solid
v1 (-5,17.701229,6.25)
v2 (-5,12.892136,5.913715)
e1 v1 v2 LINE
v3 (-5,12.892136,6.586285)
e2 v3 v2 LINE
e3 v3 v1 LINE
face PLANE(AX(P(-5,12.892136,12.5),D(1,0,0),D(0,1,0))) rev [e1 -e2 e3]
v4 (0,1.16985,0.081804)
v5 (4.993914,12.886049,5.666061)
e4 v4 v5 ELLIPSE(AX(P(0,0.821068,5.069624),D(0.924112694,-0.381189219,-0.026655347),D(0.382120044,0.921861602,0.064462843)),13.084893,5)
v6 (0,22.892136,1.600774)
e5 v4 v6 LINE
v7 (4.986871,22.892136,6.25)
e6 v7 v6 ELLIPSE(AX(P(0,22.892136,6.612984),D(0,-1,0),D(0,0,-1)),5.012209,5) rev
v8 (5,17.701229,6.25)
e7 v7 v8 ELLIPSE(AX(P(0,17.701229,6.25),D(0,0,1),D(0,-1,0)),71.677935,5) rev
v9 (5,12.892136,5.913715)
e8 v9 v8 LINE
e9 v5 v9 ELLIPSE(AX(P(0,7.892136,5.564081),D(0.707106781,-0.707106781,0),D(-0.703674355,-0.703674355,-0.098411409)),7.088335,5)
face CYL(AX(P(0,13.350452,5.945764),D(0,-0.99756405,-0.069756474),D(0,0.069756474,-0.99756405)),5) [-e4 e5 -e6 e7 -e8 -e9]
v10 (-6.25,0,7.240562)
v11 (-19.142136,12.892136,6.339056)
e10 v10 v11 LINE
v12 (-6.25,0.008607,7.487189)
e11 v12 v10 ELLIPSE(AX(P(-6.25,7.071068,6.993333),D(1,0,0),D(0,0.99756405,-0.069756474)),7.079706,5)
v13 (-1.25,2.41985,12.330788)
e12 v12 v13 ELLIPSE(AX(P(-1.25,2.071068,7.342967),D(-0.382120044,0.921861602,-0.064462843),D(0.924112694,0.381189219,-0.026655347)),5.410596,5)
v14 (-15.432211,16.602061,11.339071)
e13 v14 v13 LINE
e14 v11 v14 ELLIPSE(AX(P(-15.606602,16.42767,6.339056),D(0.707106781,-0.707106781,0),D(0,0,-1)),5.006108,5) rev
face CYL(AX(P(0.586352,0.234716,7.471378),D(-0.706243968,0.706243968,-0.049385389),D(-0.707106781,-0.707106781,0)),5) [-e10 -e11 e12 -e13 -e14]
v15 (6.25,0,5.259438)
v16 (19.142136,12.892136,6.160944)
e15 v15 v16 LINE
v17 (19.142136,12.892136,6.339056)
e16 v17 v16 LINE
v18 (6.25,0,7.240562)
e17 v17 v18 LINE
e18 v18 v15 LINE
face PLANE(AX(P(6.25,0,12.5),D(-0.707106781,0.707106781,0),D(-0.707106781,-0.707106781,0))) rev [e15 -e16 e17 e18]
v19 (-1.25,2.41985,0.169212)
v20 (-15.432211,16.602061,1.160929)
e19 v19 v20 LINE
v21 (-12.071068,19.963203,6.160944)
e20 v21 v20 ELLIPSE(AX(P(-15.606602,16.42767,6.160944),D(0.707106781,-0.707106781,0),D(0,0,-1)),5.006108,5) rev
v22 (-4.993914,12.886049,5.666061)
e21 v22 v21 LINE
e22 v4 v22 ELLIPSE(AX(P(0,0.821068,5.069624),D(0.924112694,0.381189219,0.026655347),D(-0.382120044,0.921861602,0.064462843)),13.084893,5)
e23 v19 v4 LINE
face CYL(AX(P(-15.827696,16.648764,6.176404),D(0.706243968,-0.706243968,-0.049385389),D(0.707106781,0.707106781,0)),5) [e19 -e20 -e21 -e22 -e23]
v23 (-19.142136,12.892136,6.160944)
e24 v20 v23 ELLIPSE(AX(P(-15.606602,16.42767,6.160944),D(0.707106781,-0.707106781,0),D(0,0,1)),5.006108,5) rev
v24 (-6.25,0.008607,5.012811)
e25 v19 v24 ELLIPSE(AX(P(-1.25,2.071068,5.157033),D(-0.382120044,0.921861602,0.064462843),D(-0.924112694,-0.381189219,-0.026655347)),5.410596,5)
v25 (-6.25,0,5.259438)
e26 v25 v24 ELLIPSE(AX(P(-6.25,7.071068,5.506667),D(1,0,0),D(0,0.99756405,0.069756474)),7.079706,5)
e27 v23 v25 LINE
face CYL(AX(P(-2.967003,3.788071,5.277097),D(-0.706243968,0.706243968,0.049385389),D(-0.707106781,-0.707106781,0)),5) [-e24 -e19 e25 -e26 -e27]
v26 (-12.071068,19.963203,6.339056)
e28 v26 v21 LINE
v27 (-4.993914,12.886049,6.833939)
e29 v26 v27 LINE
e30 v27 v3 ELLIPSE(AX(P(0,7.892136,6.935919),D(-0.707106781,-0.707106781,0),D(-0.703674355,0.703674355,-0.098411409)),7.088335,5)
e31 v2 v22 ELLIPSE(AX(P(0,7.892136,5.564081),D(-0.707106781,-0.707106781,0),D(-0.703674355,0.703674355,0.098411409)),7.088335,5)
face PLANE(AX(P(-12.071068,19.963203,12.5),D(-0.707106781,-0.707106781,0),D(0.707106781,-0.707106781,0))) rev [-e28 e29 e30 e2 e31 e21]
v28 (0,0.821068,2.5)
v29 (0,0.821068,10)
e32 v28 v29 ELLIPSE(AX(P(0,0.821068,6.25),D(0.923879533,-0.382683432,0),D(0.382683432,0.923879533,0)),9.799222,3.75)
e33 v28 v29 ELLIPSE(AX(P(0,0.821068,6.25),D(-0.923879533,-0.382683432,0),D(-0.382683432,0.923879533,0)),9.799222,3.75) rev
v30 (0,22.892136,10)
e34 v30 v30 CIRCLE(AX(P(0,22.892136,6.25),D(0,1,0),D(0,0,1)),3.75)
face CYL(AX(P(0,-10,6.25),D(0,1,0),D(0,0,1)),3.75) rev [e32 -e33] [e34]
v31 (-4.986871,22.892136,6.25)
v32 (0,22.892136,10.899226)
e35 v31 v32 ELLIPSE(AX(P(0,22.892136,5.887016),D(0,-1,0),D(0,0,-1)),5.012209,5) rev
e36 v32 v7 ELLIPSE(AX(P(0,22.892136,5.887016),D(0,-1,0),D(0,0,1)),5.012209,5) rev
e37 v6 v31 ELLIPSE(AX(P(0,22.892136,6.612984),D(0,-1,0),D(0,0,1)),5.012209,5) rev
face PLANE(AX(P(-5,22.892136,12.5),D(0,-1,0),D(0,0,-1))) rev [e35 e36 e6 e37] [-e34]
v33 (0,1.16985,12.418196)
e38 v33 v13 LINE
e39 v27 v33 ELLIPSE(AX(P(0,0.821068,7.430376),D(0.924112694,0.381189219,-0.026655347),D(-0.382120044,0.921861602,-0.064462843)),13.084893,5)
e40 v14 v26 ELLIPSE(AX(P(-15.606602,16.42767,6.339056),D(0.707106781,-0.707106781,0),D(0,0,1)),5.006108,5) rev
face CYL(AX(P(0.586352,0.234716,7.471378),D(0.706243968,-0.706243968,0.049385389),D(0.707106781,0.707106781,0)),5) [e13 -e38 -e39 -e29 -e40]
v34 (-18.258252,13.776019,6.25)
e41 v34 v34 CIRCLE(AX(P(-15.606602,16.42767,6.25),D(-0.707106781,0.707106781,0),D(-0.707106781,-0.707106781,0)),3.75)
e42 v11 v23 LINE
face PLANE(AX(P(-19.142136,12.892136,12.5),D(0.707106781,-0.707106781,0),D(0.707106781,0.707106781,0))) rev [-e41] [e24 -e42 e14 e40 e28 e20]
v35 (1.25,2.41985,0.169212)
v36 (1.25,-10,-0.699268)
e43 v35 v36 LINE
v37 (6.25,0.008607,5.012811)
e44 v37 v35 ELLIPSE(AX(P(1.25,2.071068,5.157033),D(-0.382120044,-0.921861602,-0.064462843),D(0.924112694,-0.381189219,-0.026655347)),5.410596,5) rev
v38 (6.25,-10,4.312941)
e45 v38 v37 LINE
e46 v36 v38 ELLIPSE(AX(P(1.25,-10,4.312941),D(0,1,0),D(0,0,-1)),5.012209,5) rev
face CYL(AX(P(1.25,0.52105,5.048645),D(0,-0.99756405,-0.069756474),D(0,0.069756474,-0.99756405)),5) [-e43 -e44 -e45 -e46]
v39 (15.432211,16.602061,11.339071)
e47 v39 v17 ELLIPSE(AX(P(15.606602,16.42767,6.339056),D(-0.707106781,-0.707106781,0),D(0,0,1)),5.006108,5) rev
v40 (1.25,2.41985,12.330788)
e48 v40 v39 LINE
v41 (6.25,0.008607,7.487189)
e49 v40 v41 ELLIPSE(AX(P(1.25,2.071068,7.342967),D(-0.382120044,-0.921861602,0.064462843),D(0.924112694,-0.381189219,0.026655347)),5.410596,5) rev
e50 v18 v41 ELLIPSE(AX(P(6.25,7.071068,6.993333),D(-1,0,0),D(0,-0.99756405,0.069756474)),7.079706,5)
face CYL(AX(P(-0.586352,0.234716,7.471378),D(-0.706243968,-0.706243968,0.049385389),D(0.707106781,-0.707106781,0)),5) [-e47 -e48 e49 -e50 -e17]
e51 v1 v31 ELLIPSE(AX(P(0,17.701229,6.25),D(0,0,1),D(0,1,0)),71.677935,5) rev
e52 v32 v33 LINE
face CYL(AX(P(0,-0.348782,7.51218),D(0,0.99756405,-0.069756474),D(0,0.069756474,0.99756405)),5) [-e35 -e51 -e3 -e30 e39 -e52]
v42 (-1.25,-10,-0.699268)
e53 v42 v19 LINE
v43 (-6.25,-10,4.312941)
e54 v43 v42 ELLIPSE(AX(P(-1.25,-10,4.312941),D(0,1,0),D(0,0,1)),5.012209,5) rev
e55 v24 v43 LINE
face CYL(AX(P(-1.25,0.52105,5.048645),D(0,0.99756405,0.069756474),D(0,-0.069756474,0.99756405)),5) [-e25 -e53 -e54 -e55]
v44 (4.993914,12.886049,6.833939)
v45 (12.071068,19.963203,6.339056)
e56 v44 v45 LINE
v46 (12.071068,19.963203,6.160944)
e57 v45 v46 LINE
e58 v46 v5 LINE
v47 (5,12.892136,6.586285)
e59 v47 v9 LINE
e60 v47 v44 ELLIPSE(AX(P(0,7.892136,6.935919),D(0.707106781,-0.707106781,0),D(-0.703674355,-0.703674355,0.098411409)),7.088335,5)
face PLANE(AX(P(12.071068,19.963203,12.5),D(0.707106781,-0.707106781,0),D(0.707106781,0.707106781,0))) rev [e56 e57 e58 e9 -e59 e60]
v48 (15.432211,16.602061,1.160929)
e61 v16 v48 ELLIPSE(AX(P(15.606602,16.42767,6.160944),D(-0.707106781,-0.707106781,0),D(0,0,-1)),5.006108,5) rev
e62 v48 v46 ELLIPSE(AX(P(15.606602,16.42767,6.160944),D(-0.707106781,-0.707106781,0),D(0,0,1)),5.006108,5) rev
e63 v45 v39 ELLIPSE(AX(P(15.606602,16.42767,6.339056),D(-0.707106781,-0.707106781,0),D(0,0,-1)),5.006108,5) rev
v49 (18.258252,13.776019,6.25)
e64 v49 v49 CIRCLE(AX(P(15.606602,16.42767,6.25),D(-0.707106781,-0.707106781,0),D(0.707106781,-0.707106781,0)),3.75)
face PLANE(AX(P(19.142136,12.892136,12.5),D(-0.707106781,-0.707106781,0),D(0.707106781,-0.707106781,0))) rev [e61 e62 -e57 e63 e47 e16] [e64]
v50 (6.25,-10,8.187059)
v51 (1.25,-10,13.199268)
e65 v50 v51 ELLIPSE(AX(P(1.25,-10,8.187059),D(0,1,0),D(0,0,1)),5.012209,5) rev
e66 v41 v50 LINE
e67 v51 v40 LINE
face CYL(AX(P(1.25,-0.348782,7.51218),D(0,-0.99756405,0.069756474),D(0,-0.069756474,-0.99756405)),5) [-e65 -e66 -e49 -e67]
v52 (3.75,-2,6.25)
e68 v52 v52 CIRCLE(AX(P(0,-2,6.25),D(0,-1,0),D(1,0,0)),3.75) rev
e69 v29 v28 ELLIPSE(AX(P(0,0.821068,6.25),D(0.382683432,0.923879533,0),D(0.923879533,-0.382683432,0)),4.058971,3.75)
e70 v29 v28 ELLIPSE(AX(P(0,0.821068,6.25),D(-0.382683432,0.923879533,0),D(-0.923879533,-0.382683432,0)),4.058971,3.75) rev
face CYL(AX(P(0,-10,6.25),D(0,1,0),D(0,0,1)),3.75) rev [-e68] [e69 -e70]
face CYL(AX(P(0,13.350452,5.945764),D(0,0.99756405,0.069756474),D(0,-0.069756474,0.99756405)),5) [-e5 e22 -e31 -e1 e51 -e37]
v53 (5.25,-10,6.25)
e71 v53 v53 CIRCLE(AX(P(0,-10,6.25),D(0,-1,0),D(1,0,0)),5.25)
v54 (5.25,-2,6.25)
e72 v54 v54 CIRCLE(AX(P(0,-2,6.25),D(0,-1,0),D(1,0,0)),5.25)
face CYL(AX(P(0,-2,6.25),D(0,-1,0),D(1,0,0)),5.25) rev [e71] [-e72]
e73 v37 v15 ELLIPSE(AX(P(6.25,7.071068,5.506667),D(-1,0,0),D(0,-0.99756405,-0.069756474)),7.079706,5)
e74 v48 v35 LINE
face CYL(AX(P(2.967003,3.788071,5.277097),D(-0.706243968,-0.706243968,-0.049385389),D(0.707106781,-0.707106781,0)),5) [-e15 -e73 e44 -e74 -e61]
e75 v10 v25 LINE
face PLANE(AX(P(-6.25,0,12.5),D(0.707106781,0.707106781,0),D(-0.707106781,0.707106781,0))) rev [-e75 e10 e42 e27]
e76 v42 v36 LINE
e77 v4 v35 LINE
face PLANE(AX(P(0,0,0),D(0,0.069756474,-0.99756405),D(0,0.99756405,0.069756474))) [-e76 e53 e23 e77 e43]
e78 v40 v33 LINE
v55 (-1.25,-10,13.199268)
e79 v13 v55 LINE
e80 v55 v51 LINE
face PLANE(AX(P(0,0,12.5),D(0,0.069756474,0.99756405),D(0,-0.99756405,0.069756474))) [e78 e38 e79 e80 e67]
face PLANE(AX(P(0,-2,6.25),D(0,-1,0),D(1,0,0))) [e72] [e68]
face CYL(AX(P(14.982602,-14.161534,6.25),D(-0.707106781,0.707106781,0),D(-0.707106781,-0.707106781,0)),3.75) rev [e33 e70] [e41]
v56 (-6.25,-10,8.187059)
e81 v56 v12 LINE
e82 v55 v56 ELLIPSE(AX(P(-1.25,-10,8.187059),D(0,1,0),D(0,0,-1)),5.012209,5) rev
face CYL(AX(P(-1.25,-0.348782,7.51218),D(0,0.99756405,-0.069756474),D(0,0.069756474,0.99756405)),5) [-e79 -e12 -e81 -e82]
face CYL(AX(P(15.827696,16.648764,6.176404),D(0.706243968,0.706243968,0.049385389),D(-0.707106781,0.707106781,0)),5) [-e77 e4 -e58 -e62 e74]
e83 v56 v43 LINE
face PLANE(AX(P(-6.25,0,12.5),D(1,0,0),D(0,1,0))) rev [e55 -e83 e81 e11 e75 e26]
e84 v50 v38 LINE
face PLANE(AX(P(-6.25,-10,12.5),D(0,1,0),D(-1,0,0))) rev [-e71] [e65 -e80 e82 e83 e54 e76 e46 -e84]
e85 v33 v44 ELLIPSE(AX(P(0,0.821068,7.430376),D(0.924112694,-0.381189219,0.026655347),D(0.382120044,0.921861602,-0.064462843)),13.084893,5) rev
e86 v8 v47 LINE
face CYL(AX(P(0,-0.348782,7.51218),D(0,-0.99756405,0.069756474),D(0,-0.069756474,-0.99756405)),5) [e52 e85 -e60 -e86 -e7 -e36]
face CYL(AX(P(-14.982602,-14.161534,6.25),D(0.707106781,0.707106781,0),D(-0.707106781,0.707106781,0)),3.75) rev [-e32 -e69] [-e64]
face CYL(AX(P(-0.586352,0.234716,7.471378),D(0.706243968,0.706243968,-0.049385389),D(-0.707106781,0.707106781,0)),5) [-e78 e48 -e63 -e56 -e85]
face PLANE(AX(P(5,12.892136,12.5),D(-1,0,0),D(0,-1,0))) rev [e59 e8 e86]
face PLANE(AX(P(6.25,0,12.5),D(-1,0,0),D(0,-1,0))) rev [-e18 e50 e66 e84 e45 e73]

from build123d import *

# Parameters (mm, degrees)
EXTRUDE_618_DEPTH           = 12.5
SKETCH_4_R                  = 3.75
CUT_EXTRUDE_975_DEPTH       = 41.05700865176058
CUT_EXTRUDE_1125_REACH      = 47.49
CUT_EXTRUDE_1125_END_RADIUS = 3.75
SKETCH_5_R                  = 3.749999999999998
SKETCH_9_R                  = 5.25
CUT_EXTRUDE_1299_DEPTH      = 8
DRAFT_2_ANGLE               = 4.000000000000009
FILLET_8_R                  = 5


with BuildPart() as part:
    # Эскиз3 → Extrude 618 (new body)
    with BuildSketch(Plane.XY):
        Polygon((-6.249999999999994, 0), (-19.142135623730994, 12.892135623731), (-12.071067811865465, 19.963203435596466), (-5.000000000000028, 12.892135623730955), (-5.000000000000029, 22.892135623730955), (4.9999999999999964, 22.892135623730955), (5.000000000000001, 12.892135623730955), (12.071067811865465, 19.96320343559647), (19.142135623730994, 12.892135623731003), (6.249999999999991, 1.73e-15), (6.2499999999999964, -10.000000000000002), (-6.2499999999999885, -10.000000000000004), align=None)
    extrude(amount=EXTRUDE_618_DEPTH)

    # Эскиз4 → Cut-Extrude 975 (cut, through all)
    with BuildSketch(Plane(origin=(0, 22.892135623730955, 0), x_dir=(-1, 0, 0), z_dir=(0, 1, 0))):
        with Locations(Location((0, 6.25, 0), (0, 0, 90))):
            Circle(SKETCH_4_R)
    extrude(amount=-CUT_EXTRUDE_975_DEPTH, mode=Mode.SUBTRACT)

    # Cut-Extrude 1125: up to this cylinder (the profile starts outside it)
    cut_extrude_1125_end = Plane(origin=(0, 16.42767, 6.25), z_dir=(0, 1, 0)) * Cylinder(CUT_EXTRUDE_1125_END_RADIUS, 103.48, mode=Mode.PRIVATE)
    # Эскиз5 → Cut-Extrude 1125 (cut, up to the surface)
    with BuildSketch(Plane(origin=(-16.017135623730912, 16.01713562373106, 0), x_dir=(0, 0, 1), z_dir=(-0.707106781186544, 0.7071067811865511, 0)), mode=Mode.PRIVATE) as cut_extrude_1125_sk1:
        with Locations(Location((6.25, 0.5805826175839922, 0), (0, 0, 270))):
            Circle(SKETCH_5_R)
    cut_extrude_1125_tool1 = extrude(cut_extrude_1125_sk1.sketch, amount=-CUT_EXTRUDE_1125_REACH, mode=Mode.PRIVATE) - cut_extrude_1125_end
    cut_extrude_1125 = cut_extrude_1125_tool1.solids().sort_by_distance((-15.606602, 16.42767, 6.25))[0]
    add(cut_extrude_1125, mode=Mode.SUBTRACT)

    # Зеркальное отражение1: Cut-Extrude 1125 across plane
    add(cut_extrude_1125.mirror(Plane(origin=(0, 0, 0), x_dir=(0, 0, 1), z_dir=(1, 0, 0))), mode=Mode.SUBTRACT)

    # Эскиз9 → Cut-Extrude 1299 (cut)
    with BuildSketch(Plane.XZ.offset(10.000000000000004)):
        with Locations((-1.39e-15, 6.25)):
            Circle(SKETCH_9_R)
    extrude(amount=-CUT_EXTRUDE_1299_DEPTH, mode=Mode.SUBTRACT)

    # Уклон2
    draft_2_faces = [part.faces().sort_by_distance(p)[0] for p in [
        (-4.1e-16, 7.904291120407681, 0),
        (-4.1e-16, 7.904291120407681, 12.5),
    ]]
    draft(draft_2_faces, Plane.ZX, DRAFT_2_ANGLE)

    # Скругление8
    # the kernel refuses this fillet: 5 mm, written as the material it takes off along each edge
    with BuildSketch(Plane(origin=(-3.4028318124765566, 4.489303811254336, 0.313922703366867), x_dir=(0.707968543318461, -0.7045235927201029, -0.049265088777904954), z_dir=(0.7062439675293066, 0.7062439675293118, 0.04938538910366094))) as fillet_8_piece_1_section:
        with BuildLine():
            CenterArc((FILLET_8_R * 0.951833326591, -FILLET_8_R), FILLET_8_R, 90.00000000000001, 87.17272263971289)
            Line((-FILLET_8_R * 0.0469494411747, -FILLET_8_R * 0.950674724384), (-FILLET_8_R * 0.06692509653, -FILLET_8_R * 0.949688218872))
            Line((-FILLET_8_R * 0.06692509653, -FILLET_8_R * 0.949688218872), (-FILLET_8_R * 0.0190366665318, FILLET_8_R * 0.02))
            Line((-FILLET_8_R * 0.0190366665318, FILLET_8_R * 0.02), (FILLET_8_R * 0.951833326591, FILLET_8_R * 0.02))
            Line((FILLET_8_R * 0.951833326591, FILLET_8_R * 0.02), (FILLET_8_R * 0.951833326591, 0))
        make_face()
    fillet_8_piece_1 = extrude(amount=33.808050099667255, mode=Mode.PRIVATE)
    fillet_8_piece_1 = split(fillet_8_piece_1, bisect_by=Plane(origin=(12.895577990710061, 19.13869325675188, 2.0784184660423826), z_dir=(-0.7071067811865445, -0.7071067811865507, 0)), keep=Keep.TOP, mode=Mode.PRIVATE)
    fillet_8_piece_1 = split(fillet_8_piece_1, bisect_by=Plane(origin=(5, 15.19090426134115, 2.0784184660423826), z_dir=(1, 4.4e-16, 0)), keep=Keep.TOP, mode=Mode.PRIVATE)
    add(fillet_8_piece_1, mode=Mode.SUBTRACT)
    with BuildSketch(Plane(origin=(4.999999999999991, 35.36168625197875, 2.4727299845475397), x_dir=(-1, -4.4e-16, -1.3e-16), z_dir=(0, -0.9975640502598243, -0.06975647374412541))) as fillet_8_piece_2_section:
        with BuildLine():
            CenterArc((FILLET_8_R, -FILLET_8_R), FILLET_8_R, 89.99999999999999, 90.00000000000001)
            Line((-1.38e-15, -FILLET_8_R), (-FILLET_8_R * 0.02, -FILLET_8_R))
            Line((-FILLET_8_R * 0.02, -FILLET_8_R), (-FILLET_8_R * 0.02, FILLET_8_R * 0.02))
            Line((-FILLET_8_R * 0.02, FILLET_8_R * 0.02), (FILLET_8_R, FILLET_8_R * 0.02))
            Line((FILLET_8_R, FILLET_8_R * 0.02), (FILLET_8_R, 0))
        make_face()
    fillet_8_piece_2 = extrude(amount=35.02441898081172, mode=Mode.PRIVATE)
    fillet_8_piece_2 = split(fillet_8_piece_2, bisect_by=Plane(origin=(3.7636479953298396, 22.892135623730955, 2.280840284876604), z_dir=(0, -1, 0)), keep=Keep.TOP, mode=Mode.PRIVATE)
    fillet_8_piece_2 = split(fillet_8_piece_2, bisect_by=Plane(origin=(6.5727359964244485, 14.464871620155414, 2.280840284876604), z_dir=(-0.7071067811865501, 0.707106781186545, 0)), keep=Keep.TOP, mode=Mode.PRIVATE)
    add(fillet_8_piece_2, mode=Mode.SUBTRACT)
    with BuildSketch(Plane(origin=(-5.0000000000000275, 0.4225849954831524, 0.02955002150929953), x_dir=(1, 9e-17, 5e-17), z_dir=(0, 0.9975640502598243, 0.06975647374412541))) as fillet_8_piece_3_section:
        with BuildLine():
            CenterArc((FILLET_8_R, -FILLET_8_R), FILLET_8_R, 90, 90)
            Line((-6.5e-16, -FILLET_8_R), (-FILLET_8_R * 0.02, -FILLET_8_R))
            Line((-FILLET_8_R * 0.02, -FILLET_8_R), (-FILLET_8_R * 0.02, FILLET_8_R * 0.02))
            Line((-FILLET_8_R * 0.02, FILLET_8_R * 0.02), (FILLET_8_R, FILLET_8_R * 0.02))
            Line((FILLET_8_R, FILLET_8_R * 0.02), (FILLET_8_R, 0))
        make_face()
    fillet_8_piece_3 = extrude(amount=35.02441898081172, mode=Mode.PRIVATE)
    fillet_8_piece_3 = split(fillet_8_piece_3, bisect_by=Plane(origin=(-3.7636479953300457, 22.892135623730955, 2.280840284876456), z_dir=(0, -1, 0)), keep=Keep.TOP, mode=Mode.PRIVATE)
    fillet_8_piece_3 = split(fillet_8_piece_3, bisect_by=Plane(origin=(-6.572735996425691, 14.464871620156634, 2.280840284876456), z_dir=(0.7071067811865512, 0.7071067811865438, 0)), keep=Keep.TOP, mode=Mode.PRIVATE)
    add(fillet_8_piece_3, mode=Mode.SUBTRACT)
    with BuildSketch(Plane(origin=(-20.47389962434201, 28.366035248073096, 1.9835464123749982), x_dir=(-0.707968543318462, -0.7045235927201018, -0.04926508877790491), z_dir=(0.7062439675293055, -0.706243967529313, -0.04938538910366102))) as fillet_8_piece_4_section:
        with BuildLine():
            CenterArc((FILLET_8_R * 0.951833326591, -FILLET_8_R), FILLET_8_R, 90.00000000000001, 87.17272263971292)
            Line((-FILLET_8_R * 0.0469494411747, -FILLET_8_R * 0.950674724384), (-FILLET_8_R * 0.06692509653, -FILLET_8_R * 0.949688218872))
            Line((-FILLET_8_R * 0.06692509653, -FILLET_8_R * 0.949688218872), (-FILLET_8_R * 0.0190366665318, FILLET_8_R * 0.02))
            Line((-FILLET_8_R * 0.0190366665318, FILLET_8_R * 0.02), (FILLET_8_R * 0.951833326591, FILLET_8_R * 0.02))
            Line((FILLET_8_R * 0.951833326591, FILLET_8_R * 0.02), (FILLET_8_R * 0.951833326591, 1e-17))
        make_face()
    fillet_8_piece_4 = extrude(amount=33.808050099667234, mode=Mode.PRIVATE)
    fillet_8_piece_4 = split(fillet_8_piece_4, bisect_by=Plane(origin=(-12.895577990710212, 19.138693256751726, 2.0784184660426637), z_dir=(0.7071067811865444, -0.7071067811865508, 0)), keep=Keep.TOP, mode=Mode.PRIVATE)
    fillet_8_piece_4 = split(fillet_8_piece_4, bisect_by=Plane(origin=(-5.000000000000028, 15.190904261339226, 2.0784184660426637), z_dir=(-1, -9e-17, 0)), keep=Keep.TOP, mode=Mode.PRIVATE)
    add(fillet_8_piece_4, mode=Mode.SUBTRACT)
    with BuildSketch(Plane(origin=(3.024785140940291, -9.274785140940285, -0.6485561563669969), x_dir=(0.034920743526734764, -0.034920743526734764, 0.9987797972241329), z_dir=(-0.7062439675293093, 0.7062439675293093, 0.04938538910366077))) as fillet_8_piece_5_section:
        with BuildLine():
            CenterArc((FILLET_8_R * 1.0506041048, FILLET_8_R), FILLET_8_R, 177.17272263971293, 92.8272773602871)
            Line((FILLET_8_R * 0.0518213370326, FILLET_8_R * 1.04932527562), (FILLET_8_R * 0.0318456816773, FILLET_8_R * 1.05031178113))
            Line((FILLET_8_R * 0.0318456816773, FILLET_8_R * 1.05031178113), (-FILLET_8_R * 0.021012082096, -FILLET_8_R * 0.02))
            Line((-FILLET_8_R * 0.021012082096, -FILLET_8_R * 0.02), (FILLET_8_R * 1.0506041048, -FILLET_8_R * 0.02))
            Line((FILLET_8_R * 1.0506041048, -FILLET_8_R * 0.02), (FILLET_8_R * 1.0506041048, -1e-17))
        make_face()
    fillet_8_piece_5 = extrude(amount=44.519609867402835, mode=Mode.PRIVATE)
    fillet_8_piece_5 = split(fillet_8_piece_5, bisect_by=Plane(origin=(-6.249999999999998, 7.634264741233562, 1.7755717356560854), z_dir=(-1, -5.3e-16, 0)), keep=Keep.TOP, mode=Mode.PRIVATE)
    fillet_8_piece_5 = split(fillet_8_piece_5, bisect_by=Plane(origin=(-18.350004337442122, 13.684266910019865, 1.7755717356560854), z_dir=(0.7071067811865444, -0.7071067811865508, 0)), keep=Keep.TOP, mode=Mode.PRIVATE)
    add(fillet_8_piece_5, mode=Mode.SUBTRACT)
    with BuildSketch(Plane(origin=(-6.249999999999982, -22.469550628247802, -1.5712240412366727), x_dir=(0, -0.06975647374412541, 0.9975640502598242), z_dir=(0, 0.9975640502598243, 0.06975647374412541))) as fillet_8_piece_6_section:
        with BuildLine():
            CenterArc((FILLET_8_R, FILLET_8_R), FILLET_8_R, 180, 90)
            Line((0, FILLET_8_R), (-FILLET_8_R * 0.02, FILLET_8_R))
            Line((-FILLET_8_R * 0.02, FILLET_8_R), (-FILLET_8_R * 0.02, -FILLET_8_R * 0.02))
            Line((-FILLET_8_R * 0.02, -FILLET_8_R * 0.02), (FILLET_8_R, -FILLET_8_R * 0.02))
            Line((FILLET_8_R, -FILLET_8_R * 0.02), (FILLET_8_R, 0))
        make_face()
    fillet_8_piece_6 = extrude(amount=35.02441898081171, mode=Mode.PRIVATE)
    fillet_8_piece_6 = split(fillet_8_piece_6, bisect_by=Plane(origin=(-2.999285634158696, -3.2507143658412976, 0.8277016679449097), z_dir=(-0.7071067811865476, -0.7071067811865476, 0)), keep=Keep.TOP, mode=Mode.PRIVATE)
    fillet_8_piece_6 = split(fillet_8_piece_6, bisect_by=Plane(origin=(-5.249047512261576, -10.000000000000004, 0.8277016679449097), z_dir=(-1.4e-16, 1, 0)), keep=Keep.TOP, mode=Mode.PRIVATE)
    add(fillet_8_piece_6, mode=Mode.SUBTRACT)
    with BuildSketch(Plane(origin=(6.249999999999985, 12.469550628247795, 0.871955921801567), x_dir=(-1, -5.3e-16, -1e-16), z_dir=(0, -0.9975640502598243, -0.06975647374412541))) as fillet_8_piece_7_section:
        with BuildLine():
            CenterArc((FILLET_8_R, -FILLET_8_R), FILLET_8_R, 89.99999999999999, 90.00000000000001)
            Line((-1.19e-15, -FILLET_8_R), (-FILLET_8_R * 0.02, -FILLET_8_R))
            Line((-FILLET_8_R * 0.02, -FILLET_8_R), (-FILLET_8_R * 0.02, FILLET_8_R * 0.02))
            Line((-FILLET_8_R * 0.02, FILLET_8_R * 0.02), (FILLET_8_R, FILLET_8_R * 0.02))
            Line((FILLET_8_R, FILLET_8_R * 0.02), (FILLET_8_R, 0))
        make_face()
    fillet_8_piece_7 = extrude(amount=35.02441898081172, mode=Mode.PRIVATE)
    fillet_8_piece_7 = split(fillet_8_piece_7, bisect_by=Plane(origin=(5.249047512262002, -10.000000000000002, 0.8277016679442836), z_dir=(-1.4e-16, 1, 0)), keep=Keep.TOP, mode=Mode.PRIVATE)
    fillet_8_piece_7 = split(fillet_8_piece_7, bisect_by=Plane(origin=(2.9992856341578893, -3.250714365842102, 0.8277016679442836), z_dir=(0.7071067811865476, -0.7071067811865476, 0)), keep=Keep.TOP, mode=Mode.PRIVATE)
    add(fillet_8_piece_7, mode=Mode.SUBTRACT)
    with BuildSketch(Plane(origin=(28.416920764671282, 22.16692076467129, 1.5500620996778676), x_dir=(-0.7079685433184584, 0.7045235927201055, 0.04926508877790521), z_dir=(-0.7062439675293093, -0.7062439675293093, -0.04938538910366077))) as fillet_8_piece_8_section:
        with BuildLine():
            CenterArc((FILLET_8_R * 1.0506041048, -FILLET_8_R), FILLET_8_R, 90, 92.8272773602871)
            Line((FILLET_8_R * 0.0518213370326, -FILLET_8_R * 1.04932527562), (FILLET_8_R * 0.0318456816773, -FILLET_8_R * 1.05031178113))
            Line((FILLET_8_R * 0.0318456816773, -FILLET_8_R * 1.05031178113), (-FILLET_8_R * 0.021012082096, FILLET_8_R * 0.02))
            Line((-FILLET_8_R * 0.021012082096, FILLET_8_R * 0.02), (FILLET_8_R * 1.0506041048, FILLET_8_R * 0.02))
            Line((FILLET_8_R * 1.0506041048, FILLET_8_R * 0.02), (FILLET_8_R * 1.0506041048, 1e-17))
        make_face()
    fillet_8_piece_8 = extrude(amount=44.519609867402856, mode=Mode.PRIVATE)
    fillet_8_piece_8 = split(fillet_8_piece_8, bisect_by=Plane(origin=(18.350004337441796, 13.684266910020192, 1.7755717356563456), z_dir=(-0.7071067811865445, -0.7071067811865507, 0)), keep=Keep.TOP, mode=Mode.PRIVATE)
    fillet_8_piece_8 = split(fillet_8_piece_8, bisect_by=Plane(origin=(6.249999999999987, 7.634264741230422, 1.7755717356563456), z_dir=(1, 5.3e-16, 0)), keep=Keep.TOP, mode=Mode.PRIVATE)
    add(fillet_8_piece_8, mode=Mode.SUBTRACT)
    with BuildSketch(Plane(origin=(-6.249999999999982, -22.469550628247813, 14.071224041236674), x_dir=(0, -0.06975647374412541, -0.9975640502598242), z_dir=(0, 0.9975640502598243, -0.06975647374412541))) as fillet_8_piece_9_section:
        with BuildLine():
            CenterArc((FILLET_8_R, -FILLET_8_R), FILLET_8_R, 90.00000000000001, 89.99999999999999)
            Line((6.4e-16, -FILLET_8_R), (-FILLET_8_R * 0.02, -FILLET_8_R))
            Line((-FILLET_8_R * 0.02, -FILLET_8_R), (-FILLET_8_R * 0.02, FILLET_8_R * 0.02))
            Line((-FILLET_8_R * 0.02, FILLET_8_R * 0.02), (FILLET_8_R, FILLET_8_R * 0.02))
            Line((FILLET_8_R, FILLET_8_R * 0.02), (FILLET_8_R, 0))
        make_face()
    fillet_8_piece_9 = extrude(amount=35.02441898081173, mode=Mode.PRIVATE)
    fillet_8_piece_9 = split(fillet_8_piece_9, bisect_by=Plane(origin=(-2.9992856341583285, -3.2507143658416653, 11.672298332055412), z_dir=(-0.7071067811865476, -0.7071067811865476, 0)), keep=Keep.TOP, mode=Mode.PRIVATE)
    fillet_8_piece_9 = split(fillet_8_piece_9, bisect_by=Plane(origin=(-5.249047512261512, -10.000000000000004, 11.672298332055412), z_dir=(-1.4e-16, 1, 0)), keep=Keep.TOP, mode=Mode.PRIVATE)
    add(fillet_8_piece_9, mode=Mode.SUBTRACT)
    with BuildSketch(Plane(origin=(6.249999999999985, 12.469550628247802, 11.628044078198434), x_dir=(-1, -5.3e-16, -1e-17), z_dir=(0, -0.9975640502598243, 0.06975647374412541))) as fillet_8_piece_10_section:
        with BuildLine():
            CenterArc((FILLET_8_R, FILLET_8_R), FILLET_8_R, 180, 90)
            Line((-6.4e-16, FILLET_8_R), (-FILLET_8_R * 0.02, FILLET_8_R))
            Line((-FILLET_8_R * 0.02, FILLET_8_R), (-FILLET_8_R * 0.02, -FILLET_8_R * 0.02))
            Line((-FILLET_8_R * 0.02, -FILLET_8_R * 0.02), (FILLET_8_R, -FILLET_8_R * 0.02))
            Line((FILLET_8_R, -FILLET_8_R * 0.02), (FILLET_8_R, 0))
        make_face()
    fillet_8_piece_10 = extrude(amount=35.02441898081173, mode=Mode.PRIVATE)
    fillet_8_piece_10 = split(fillet_8_piece_10, bisect_by=Plane(origin=(5.2490475122620985, -10.000000000000002, 11.672298332055796), z_dir=(-1.4e-16, 1, 0)), keep=Keep.TOP, mode=Mode.PRIVATE)
    fillet_8_piece_10 = split(fillet_8_piece_10, bisect_by=Plane(origin=(2.9992856341578964, -3.2507143658420947, 11.672298332055796), z_dir=(0.7071067811865476, -0.7071067811865476, 0)), keep=Keep.TOP, mode=Mode.PRIVATE)
    add(fillet_8_piece_10, mode=Mode.SUBTRACT)
    with BuildSketch(Plane(origin=(28.41692076467128, 22.16692076467129, 10.949937900322134), x_dir=(-0.7079685433184584, 0.7045235927201055, -0.049265088777905426), z_dir=(-0.7062439675293093, -0.7062439675293093, 0.04938538910366077))) as fillet_8_piece_11_section:
        with BuildLine():
            CenterArc((FILLET_8_R * 1.0506041048, FILLET_8_R), FILLET_8_R, 177.1727226397129, 92.8272773602871)
            Line((FILLET_8_R * 0.0518213370326, FILLET_8_R * 1.04932527562), (FILLET_8_R * 0.0318456816773, FILLET_8_R * 1.05031178113))
            Line((FILLET_8_R * 0.0318456816773, FILLET_8_R * 1.05031178113), (-FILLET_8_R * 0.021012082096, -FILLET_8_R * 0.02))
            Line((-FILLET_8_R * 0.021012082096, -FILLET_8_R * 0.02), (FILLET_8_R * 1.0506041048, -FILLET_8_R * 0.02))
            Line((FILLET_8_R * 1.0506041048, -FILLET_8_R * 0.02), (FILLET_8_R * 1.0506041048, -1e-17))
        make_face()
    fillet_8_piece_11 = extrude(amount=44.51960986740285, mode=Mode.PRIVATE)
    fillet_8_piece_11 = split(fillet_8_piece_11, bisect_by=Plane(origin=(18.35000433744206, 13.68426691001993, 10.724428264343876), z_dir=(-0.7071067811865445, -0.7071067811865507, 0)), keep=Keep.TOP, mode=Mode.PRIVATE)
    fillet_8_piece_11 = split(fillet_8_piece_11, bisect_by=Plane(origin=(6.249999999999987, 7.63426474123258, 10.724428264343876), z_dir=(1, 5.3e-16, 0)), keep=Keep.TOP, mode=Mode.PRIVATE)
    add(fillet_8_piece_11, mode=Mode.SUBTRACT)
    with BuildSketch(Plane(origin=(-3.402831812476554, 4.489303811254339, 12.186077296633133), x_dir=(0.707968543318461, -0.7045235927201029, 0.04926508877790491), z_dir=(0.7062439675293066, 0.7062439675293118, -0.04938538910366094))) as fillet_8_piece_12_section:
        with BuildLine():
            CenterArc((FILLET_8_R * 0.951833326591, FILLET_8_R), FILLET_8_R, 182.8272773602871, 87.1727226397129)
            Line((-FILLET_8_R * 0.0469494411747, FILLET_8_R * 0.950674724384), (-FILLET_8_R * 0.06692509653, FILLET_8_R * 0.949688218872))
            Line((-FILLET_8_R * 0.06692509653, FILLET_8_R * 0.949688218872), (-FILLET_8_R * 0.0190366665318, -FILLET_8_R * 0.02))
            Line((-FILLET_8_R * 0.0190366665318, -FILLET_8_R * 0.02), (FILLET_8_R * 0.951833326591, -FILLET_8_R * 0.02))
            Line((FILLET_8_R * 0.951833326591, -FILLET_8_R * 0.02), (FILLET_8_R * 0.951833326591, -3e-17))
        make_face()
    fillet_8_piece_12 = extrude(amount=33.808050099667255, mode=Mode.PRIVATE)
    fillet_8_piece_12 = split(fillet_8_piece_12, bisect_by=Plane(origin=(12.895577990710052, 19.13869325675189, 10.421581533957658), z_dir=(-0.7071067811865445, -0.7071067811865507, 0)), keep=Keep.TOP, mode=Mode.PRIVATE)
    fillet_8_piece_12 = split(fillet_8_piece_12, bisect_by=Plane(origin=(5, 15.190904261341167, 10.421581533957658), z_dir=(1, 4.4e-16, 0)), keep=Keep.TOP, mode=Mode.PRIVATE)
    add(fillet_8_piece_12, mode=Mode.SUBTRACT)
    with BuildSketch(Plane(origin=(4.999999999999991, 35.36168625197876, 10.02727001545246), x_dir=(-1, -4.4e-16, 1.3e-16), z_dir=(0, -0.9975640502598243, 0.06975647374412541))) as fillet_8_piece_13_section:
        with BuildLine():
            CenterArc((FILLET_8_R, FILLET_8_R), FILLET_8_R, 180, 90)
            Line((-1.38e-15, FILLET_8_R), (-FILLET_8_R * 0.02, FILLET_8_R))
            Line((-FILLET_8_R * 0.02, FILLET_8_R), (-FILLET_8_R * 0.02, -FILLET_8_R * 0.02))
            Line((-FILLET_8_R * 0.02, -FILLET_8_R * 0.02), (FILLET_8_R, -FILLET_8_R * 0.02))
            Line((FILLET_8_R, -FILLET_8_R * 0.02), (FILLET_8_R, 0))
        make_face()
    fillet_8_piece_13 = extrude(amount=35.024418980811724, mode=Mode.PRIVATE)
    fillet_8_piece_13 = split(fillet_8_piece_13, bisect_by=Plane(origin=(3.7636479953302784, 22.892135623730955, 10.219159715123435), z_dir=(0, -1, 0)), keep=Keep.TOP, mode=Mode.PRIVATE)
    fillet_8_piece_13 = split(fillet_8_piece_13, bisect_by=Plane(origin=(6.572735996426328, 14.464871620157293, 10.219159715123435), z_dir=(-0.7071067811865501, 0.707106781186545, 0)), keep=Keep.TOP, mode=Mode.PRIVATE)
    add(fillet_8_piece_13, mode=Mode.SUBTRACT)
    with BuildSketch(Plane(origin=(-5.0000000000000275, 0.4225849954831524, 12.4704499784907), x_dir=(1, 9e-17, -3e-17), z_dir=(0, 0.9975640502598243, -0.06975647374412541))) as fillet_8_piece_14_section:
        with BuildLine():
            CenterArc((FILLET_8_R, FILLET_8_R), FILLET_8_R, 180, 90)
            Line((-7.6e-16, FILLET_8_R), (-FILLET_8_R * 0.02, FILLET_8_R))
            Line((-FILLET_8_R * 0.02, FILLET_8_R), (-FILLET_8_R * 0.02, -FILLET_8_R * 0.02))
            Line((-FILLET_8_R * 0.02, -FILLET_8_R * 0.02), (FILLET_8_R, -FILLET_8_R * 0.02))
            Line((FILLET_8_R, -FILLET_8_R * 0.02), (FILLET_8_R, 0))
        make_face()
    fillet_8_piece_14 = extrude(amount=35.02441898081172, mode=Mode.PRIVATE)
    fillet_8_piece_14 = split(fillet_8_piece_14, bisect_by=Plane(origin=(-3.7636479953302375, 22.892135623730955, 10.21915971512358), z_dir=(0, -1, 0)), keep=Keep.TOP, mode=Mode.PRIVATE)
    fillet_8_piece_14 = split(fillet_8_piece_14, bisect_by=Plane(origin=(-6.572735996426481, 14.464871620157425, 10.21915971512358), z_dir=(0.7071067811865512, 0.7071067811865438, 0)), keep=Keep.TOP, mode=Mode.PRIVATE)
    add(fillet_8_piece_14, mode=Mode.SUBTRACT)
    with BuildSketch(Plane(origin=(-20.47389962434201, 28.366035248073096, 10.516453587625001), x_dir=(-0.7079685433184622, -0.7045235927201017, 0.04926508877790538), z_dir=(0.7062439675293055, -0.706243967529313, 0.04938538910366102))) as fillet_8_piece_15_section:
        with BuildLine():
            CenterArc((FILLET_8_R * 0.951833326591, FILLET_8_R), FILLET_8_R, 182.8272773602871, 87.1727226397129)
            Line((-FILLET_8_R * 0.0469494411747, FILLET_8_R * 0.950674724384), (-FILLET_8_R * 0.06692509653, FILLET_8_R * 0.949688218872))
            Line((-FILLET_8_R * 0.06692509653, FILLET_8_R * 0.949688218872), (-FILLET_8_R * 0.0190366665318, -FILLET_8_R * 0.02))
            Line((-FILLET_8_R * 0.0190366665318, -FILLET_8_R * 0.02), (FILLET_8_R * 0.951833326591, -FILLET_8_R * 0.02))
            Line((FILLET_8_R * 0.951833326591, -FILLET_8_R * 0.02), (FILLET_8_R * 0.951833326591, 5e-17))
        make_face()
    fillet_8_piece_15 = extrude(amount=33.808050099667234, mode=Mode.PRIVATE)
    fillet_8_piece_15 = split(fillet_8_piece_15, bisect_by=Plane(origin=(-12.895577990710136, 19.1386932567518, 10.421581533957545), z_dir=(0.7071067811865444, -0.7071067811865508, 0)), keep=Keep.TOP, mode=Mode.PRIVATE)
    fillet_8_piece_15 = split(fillet_8_piece_15, bisect_by=Plane(origin=(-5.000000000000028, 15.190904261340359, 10.421581533957545), z_dir=(-1, -9e-17, 0)), keep=Keep.TOP, mode=Mode.PRIVATE)
    add(fillet_8_piece_15, mode=Mode.SUBTRACT)
    with BuildSketch(Plane(origin=(3.024785140940291, -9.274785140940285, 13.148556156366999), x_dir=(0.034920743526734764, -0.034920743526734764, -0.9987797972241329), z_dir=(-0.7062439675293093, 0.7062439675293093, -0.04938538910366077))) as fillet_8_piece_16_section:
        with BuildLine():
            CenterArc((FILLET_8_R * 1.0506041048, -FILLET_8_R), FILLET_8_R, 90, 92.8272773602871)
            Line((FILLET_8_R * 0.0518213370326, -FILLET_8_R * 1.04932527562), (FILLET_8_R * 0.0318456816773, -FILLET_8_R * 1.05031178113))
            Line((FILLET_8_R * 0.0318456816773, -FILLET_8_R * 1.05031178113), (-FILLET_8_R * 0.021012082096, FILLET_8_R * 0.02))
            Line((-FILLET_8_R * 0.021012082096, FILLET_8_R * 0.02), (FILLET_8_R * 1.0506041048, FILLET_8_R * 0.02))
            Line((FILLET_8_R * 1.0506041048, FILLET_8_R * 0.02), (FILLET_8_R * 1.0506041048, 1e-17))
        make_face()
    fillet_8_piece_16 = extrude(amount=44.51960986740285, mode=Mode.PRIVATE)
    fillet_8_piece_16 = split(fillet_8_piece_16, bisect_by=Plane(origin=(-6.249999999999998, 7.634264741233135, 10.72442826434399), z_dir=(-1, -5.3e-16, 0)), keep=Keep.TOP, mode=Mode.PRIVATE)
    fillet_8_piece_16 = split(fillet_8_piece_16, bisect_by=Plane(origin=(-18.350004337442037, 13.68426691001995, 10.72442826434399), z_dir=(0.7071067811865444, -0.7071067811865508, 0)), keep=Keep.TOP, mode=Mode.PRIVATE)
    add(fillet_8_piece_16, mode=Mode.SUBTRACT)
    with BuildSketch(Plane(origin=(4.999999999999991, 35.36168625197875, 2.4727299845475397), x_dir=(-1, -4.4e-16, -1.3e-16), z_dir=(0, -0.9975640502598243, -0.06975647374412541))) as fillet_8_piece_17a_section:
        with BuildLine():
            CenterArc((FILLET_8_R, -FILLET_8_R), FILLET_8_R, 89.99999999999999, 90.00000000000001)
            Line((-1.38e-15, -FILLET_8_R), (-FILLET_8_R * 0.02, -FILLET_8_R))
            Line((-FILLET_8_R * 0.02, -FILLET_8_R), (-FILLET_8_R * 0.02, FILLET_8_R * 0.02))
            Line((-FILLET_8_R * 0.02, FILLET_8_R * 0.02), (FILLET_8_R, FILLET_8_R * 0.02))
            Line((FILLET_8_R, FILLET_8_R * 0.02), (FILLET_8_R, 0))
        make_face()
    fillet_8_piece_17a = extrude(amount=35.02441898081172, mode=Mode.PRIVATE)
    fillet_8_piece_17a = split(fillet_8_piece_17a, bisect_by=Plane(origin=(1.092194353831831, 8.984329977562757, 1.6288587466862252), z_dir=(0.7071067811865501, -0.707106781186545, 0)), keep=Keep.TOP, mode=Mode.PRIVATE)
    with BuildSketch(Plane(origin=(-3.4028318124765566, 4.489303811254336, 0.313922703366867), x_dir=(0.707968543318461, -0.7045235927201029, -0.049265088777904954), z_dir=(0.7062439675293066, 0.7062439675293118, 0.04938538910366094))) as fillet_8_piece_17b_section:
        with BuildLine():
            CenterArc((FILLET_8_R * 0.951833326591, -FILLET_8_R), FILLET_8_R, 90.00000000000001, 87.17272263971289)
            Line((-FILLET_8_R * 0.0469494411747, -FILLET_8_R * 0.950674724384), (-FILLET_8_R * 0.06692509653, -FILLET_8_R * 0.949688218872))
            Line((-FILLET_8_R * 0.06692509653, -FILLET_8_R * 0.949688218872), (-FILLET_8_R * 0.0190366665318, FILLET_8_R * 0.02))
            Line((-FILLET_8_R * 0.0190366665318, FILLET_8_R * 0.02), (FILLET_8_R * 0.951833326591, FILLET_8_R * 0.02))
            Line((FILLET_8_R * 0.951833326591, FILLET_8_R * 0.02), (FILLET_8_R * 0.951833326591, 0))
        make_face()
    fillet_8_piece_17b = extrude(amount=33.808050099667255, mode=Mode.PRIVATE)
    fillet_8_piece_17b = split(fillet_8_piece_17b, bisect_by=Plane(origin=(5.0000000000000036, 7.643322173814759, 1.6701485423468212), z_dir=(-1, -4.4e-16, 0)), keep=Keep.TOP, mode=Mode.PRIVATE)
    fillet_8_piece_17 = fillet_8_piece_17a & fillet_8_piece_17b
    add(fillet_8_piece_17, mode=Mode.SUBTRACT)
    with BuildSketch(Plane(origin=(-20.47389962434201, 28.366035248073096, 1.9835464123749982), x_dir=(-0.707968543318462, -0.7045235927201018, -0.04926508877790491), z_dir=(0.7062439675293055, -0.706243967529313, -0.04938538910366102))) as fillet_8_piece_18a_section:
        with BuildLine():
            CenterArc((FILLET_8_R * 0.951833326591, -FILLET_8_R), FILLET_8_R, 90.00000000000001, 87.17272263971292)
            Line((-FILLET_8_R * 0.0469494411747, -FILLET_8_R * 0.950674724384), (-FILLET_8_R * 0.06692509653, -FILLET_8_R * 0.949688218872))
            Line((-FILLET_8_R * 0.06692509653, -FILLET_8_R * 0.949688218872), (-FILLET_8_R * 0.0190366665318, FILLET_8_R * 0.02))
            Line((-FILLET_8_R * 0.0190366665318, FILLET_8_R * 0.02), (FILLET_8_R * 0.951833326591, FILLET_8_R * 0.02))
            Line((FILLET_8_R * 0.951833326591, FILLET_8_R * 0.02), (FILLET_8_R * 0.951833326591, 1e-17))
        make_face()
    fillet_8_piece_18a = extrude(amount=33.808050099667234, mode=Mode.PRIVATE)
    fillet_8_piece_18a = split(fillet_8_piece_18a, bisect_by=Plane(origin=(-5.0000000000000275, 7.643322173813422, 1.6701485423463631), z_dir=(1, 9e-17, 0)), keep=Keep.TOP, mode=Mode.PRIVATE)
    with BuildSketch(Plane(origin=(-5.0000000000000275, 0.4225849954831524, 0.02955002150929953), x_dir=(1, 9e-17, 5e-17), z_dir=(0, 0.9975640502598243, 0.06975647374412541))) as fillet_8_piece_18b_section:
        with BuildLine():
            CenterArc((FILLET_8_R, -FILLET_8_R), FILLET_8_R, 90, 90)
            Line((-6.5e-16, -FILLET_8_R), (-FILLET_8_R * 0.02, -FILLET_8_R))
            Line((-FILLET_8_R * 0.02, -FILLET_8_R), (-FILLET_8_R * 0.02, FILLET_8_R * 0.02))
            Line((-FILLET_8_R * 0.02, FILLET_8_R * 0.02), (FILLET_8_R, FILLET_8_R * 0.02))
            Line((FILLET_8_R, FILLET_8_R * 0.02), (FILLET_8_R, 0))
        make_face()
    fillet_8_piece_18b = extrude(amount=35.02441898081172, mode=Mode.PRIVATE)
    fillet_8_piece_18b = split(fillet_8_piece_18b, bisect_by=Plane(origin=(-1.092194353832559, 8.984329977563444, 1.6288587466865896), z_dir=(-0.7071067811865512, -0.7071067811865438, 0)), keep=Keep.TOP, mode=Mode.PRIVATE)
    fillet_8_piece_18 = fillet_8_piece_18a & fillet_8_piece_18b
    add(fillet_8_piece_18, mode=Mode.SUBTRACT)
    with BuildSketch(Plane(origin=(3.024785140940291, -9.274785140940285, -0.6485561563669969), x_dir=(0.034920743526734764, -0.034920743526734764, 0.9987797972241329), z_dir=(-0.7062439675293093, 0.7062439675293093, 0.04938538910366077))) as fillet_8_piece_19a_section:
        with BuildLine():
            CenterArc((FILLET_8_R * 1.0506041048, FILLET_8_R), FILLET_8_R, 177.17272263971293, 92.8272773602871)
            Line((FILLET_8_R * 0.0518213370326, FILLET_8_R * 1.04932527562), (FILLET_8_R * 0.0318456816773, FILLET_8_R * 1.05031178113))
            Line((FILLET_8_R * 0.0318456816773, FILLET_8_R * 1.05031178113), (-FILLET_8_R * 0.021012082096, -FILLET_8_R * 0.02))
            Line((-FILLET_8_R * 0.021012082096, -FILLET_8_R * 0.02), (FILLET_8_R * 1.0506041048, -FILLET_8_R * 0.02))
            Line((FILLET_8_R * 1.0506041048, -FILLET_8_R * 0.02), (FILLET_8_R * 1.0506041048, -1e-17))
        make_face()
    fillet_8_piece_19a = extrude(amount=44.519609867402835, mode=Mode.PRIVATE)
    fillet_8_piece_19a = split(fillet_8_piece_19a, bisect_by=Plane(origin=(-6.249999999999992, -3.300210825762088, 0.9188548035940711), z_dir=(1, 5.3e-16, 0)), keep=Keep.TOP, mode=Mode.PRIVATE)
    with BuildSketch(Plane(origin=(-6.249999999999982, -22.469550628247802, -1.5712240412366727), x_dir=(0, -0.06975647374412541, 0.9975640502598242), z_dir=(0, 0.9975640502598243, 0.06975647374412541))) as fillet_8_piece_19b_section:
        with BuildLine():
            CenterArc((FILLET_8_R, FILLET_8_R), FILLET_8_R, 180, 90)
            Line((0, FILLET_8_R), (-FILLET_8_R * 0.02, FILLET_8_R))
            Line((-FILLET_8_R * 0.02, FILLET_8_R), (-FILLET_8_R * 0.02, -FILLET_8_R * 0.02))
            Line((-FILLET_8_R * 0.02, -FILLET_8_R * 0.02), (FILLET_8_R, -FILLET_8_R * 0.02))
            Line((FILLET_8_R, -FILLET_8_R * 0.02), (FILLET_8_R, 0))
        make_face()
    fillet_8_piece_19b = extrude(amount=35.02441898081171, mode=Mode.PRIVATE)
    fillet_8_piece_19b = split(fillet_8_piece_19b, bisect_by=Plane(origin=(-8.43255622230143, 2.182556222301437, 1.4684963120997898), z_dir=(0.7071067811865476, 0.7071067811865476, 0)), keep=Keep.TOP, mode=Mode.PRIVATE)
    fillet_8_piece_19 = fillet_8_piece_19a & fillet_8_piece_19b
    add(fillet_8_piece_19, mode=Mode.SUBTRACT)
    with BuildSketch(Plane(origin=(28.416920764671282, 22.16692076467129, 1.5500620996778676), x_dir=(-0.7079685433184584, 0.7045235927201055, 0.04926508877790521), z_dir=(-0.7062439675293093, -0.7062439675293093, -0.04938538910366077))) as fillet_8_piece_20a_section:
        with BuildLine():
            CenterArc((FILLET_8_R * 1.0506041048, -FILLET_8_R), FILLET_8_R, 90, 92.8272773602871)
            Line((FILLET_8_R * 0.0518213370326, -FILLET_8_R * 1.04932527562), (FILLET_8_R * 0.0318456816773, -FILLET_8_R * 1.05031178113))
            Line((FILLET_8_R * 0.0318456816773, -FILLET_8_R * 1.05031178113), (-FILLET_8_R * 0.021012082096, FILLET_8_R * 0.02))
            Line((-FILLET_8_R * 0.021012082096, FILLET_8_R * 0.02), (FILLET_8_R * 1.0506041048, FILLET_8_R * 0.02))
            Line((FILLET_8_R * 1.0506041048, FILLET_8_R * 0.02), (FILLET_8_R * 1.0506041048, 1e-17))
        make_face()
    fillet_8_piece_20a = extrude(amount=44.519609867402856, mode=Mode.PRIVATE)
    fillet_8_piece_20a = split(fillet_8_piece_20a, bisect_by=Plane(origin=(6.249999999999993, -3.3002108257669858, 0.91885480359322), z_dir=(-1, -5.3e-16, 0)), keep=Keep.TOP, mode=Mode.PRIVATE)
    with BuildSketch(Plane(origin=(6.249999999999985, 12.469550628247795, 0.871955921801567), x_dir=(-1, -5.3e-16, -1e-16), z_dir=(0, -0.9975640502598243, -0.06975647374412541))) as fillet_8_piece_20b_section:
        with BuildLine():
            CenterArc((FILLET_8_R, -FILLET_8_R), FILLET_8_R, 89.99999999999999, 90.00000000000001)
            Line((-1.19e-15, -FILLET_8_R), (-FILLET_8_R * 0.02, -FILLET_8_R))
            Line((-FILLET_8_R * 0.02, -FILLET_8_R), (-FILLET_8_R * 0.02, FILLET_8_R * 0.02))
            Line((-FILLET_8_R * 0.02, FILLET_8_R * 0.02), (FILLET_8_R, FILLET_8_R * 0.02))
            Line((FILLET_8_R, FILLET_8_R * 0.02), (FILLET_8_R, 0))
        make_face()
    fillet_8_piece_20b = extrude(amount=35.02441898081172, mode=Mode.PRIVATE)
    fillet_8_piece_20b = split(fillet_8_piece_20b, bisect_by=Plane(origin=(8.432556222300084, 2.182556222300093, 1.4684963120999766), z_dir=(-0.7071067811865476, 0.7071067811865476, 0)), keep=Keep.TOP, mode=Mode.PRIVATE)
    fillet_8_piece_20 = fillet_8_piece_20a & fillet_8_piece_20b
    add(fillet_8_piece_20, mode=Mode.SUBTRACT)
    with BuildSketch(Plane(origin=(3.024785140940291, -9.274785140940285, 13.148556156366999), x_dir=(0.034920743526734764, -0.034920743526734764, -0.9987797972241329), z_dir=(-0.7062439675293093, 0.7062439675293093, -0.04938538910366077))) as fillet_8_piece_21a_section:
        with BuildLine():
            CenterArc((FILLET_8_R * 1.0506041048, -FILLET_8_R), FILLET_8_R, 90, 92.8272773602871)
            Line((FILLET_8_R * 0.0518213370326, -FILLET_8_R * 1.04932527562), (FILLET_8_R * 0.0318456816773, -FILLET_8_R * 1.05031178113))
            Line((FILLET_8_R * 0.0318456816773, -FILLET_8_R * 1.05031178113), (-FILLET_8_R * 0.021012082096, FILLET_8_R * 0.02))
            Line((-FILLET_8_R * 0.021012082096, FILLET_8_R * 0.02), (FILLET_8_R * 1.0506041048, FILLET_8_R * 0.02))
            Line((FILLET_8_R * 1.0506041048, FILLET_8_R * 0.02), (FILLET_8_R * 1.0506041048, 1e-17))
        make_face()
    fillet_8_piece_21a = extrude(amount=44.51960986740285, mode=Mode.PRIVATE)
    fillet_8_piece_21a = split(fillet_8_piece_21a, bisect_by=Plane(origin=(-6.249999999999992, -3.300210825762769, 11.581145196405938), z_dir=(1, 5.3e-16, 0)), keep=Keep.TOP, mode=Mode.PRIVATE)
    with BuildSketch(Plane(origin=(-6.249999999999982, -22.469550628247813, 14.071224041236674), x_dir=(0, -0.06975647374412541, -0.9975640502598242), z_dir=(0, 0.9975640502598243, -0.06975647374412541))) as fillet_8_piece_21b_section:
        with BuildLine():
            CenterArc((FILLET_8_R, -FILLET_8_R), FILLET_8_R, 90.00000000000001, 89.99999999999999)
            Line((6.4e-16, -FILLET_8_R), (-FILLET_8_R * 0.02, -FILLET_8_R))
            Line((-FILLET_8_R * 0.02, -FILLET_8_R), (-FILLET_8_R * 0.02, FILLET_8_R * 0.02))
            Line((-FILLET_8_R * 0.02, FILLET_8_R * 0.02), (FILLET_8_R, FILLET_8_R * 0.02))
            Line((FILLET_8_R, FILLET_8_R * 0.02), (FILLET_8_R, 0))
        make_face()
    fillet_8_piece_21b = extrude(amount=35.02441898081173, mode=Mode.PRIVATE)
    fillet_8_piece_21b = split(fillet_8_piece_21b, bisect_by=Plane(origin=(-8.432556222301223, 2.18255622230123, 11.031503687900047), z_dir=(0.7071067811865476, 0.7071067811865476, 0)), keep=Keep.TOP, mode=Mode.PRIVATE)
    fillet_8_piece_21 = fillet_8_piece_21a & fillet_8_piece_21b
    add(fillet_8_piece_21, mode=Mode.SUBTRACT)
    with BuildSketch(Plane(origin=(28.41692076467128, 22.16692076467129, 10.949937900322134), x_dir=(-0.7079685433184584, 0.7045235927201055, -0.049265088777905426), z_dir=(-0.7062439675293093, -0.7062439675293093, 0.04938538910366077))) as fillet_8_piece_22a_section:
        with BuildLine():
            CenterArc((FILLET_8_R * 1.0506041048, FILLET_8_R), FILLET_8_R, 177.1727226397129, 92.8272773602871)
            Line((FILLET_8_R * 0.0518213370326, FILLET_8_R * 1.04932527562), (FILLET_8_R * 0.0318456816773, FILLET_8_R * 1.05031178113))
            Line((FILLET_8_R * 0.0318456816773, FILLET_8_R * 1.05031178113), (-FILLET_8_R * 0.021012082096, -FILLET_8_R * 0.02))
            Line((-FILLET_8_R * 0.021012082096, -FILLET_8_R * 0.02), (FILLET_8_R * 1.0506041048, -FILLET_8_R * 0.02))
            Line((FILLET_8_R * 1.0506041048, -FILLET_8_R * 0.02), (FILLET_8_R * 1.0506041048, -1e-17))
        make_face()
    fillet_8_piece_22a = extrude(amount=44.51960986740285, mode=Mode.PRIVATE)
    fillet_8_piece_22a = split(fillet_8_piece_22a, bisect_by=Plane(origin=(6.249999999999993, -3.300210825763908, 11.581145196406068), z_dir=(-1, -5.3e-16, 0)), keep=Keep.TOP, mode=Mode.PRIVATE)
    with BuildSketch(Plane(origin=(6.249999999999985, 12.469550628247802, 11.628044078198434), x_dir=(-1, -5.3e-16, -1e-17), z_dir=(0, -0.9975640502598243, 0.06975647374412541))) as fillet_8_piece_22b_section:
        with BuildLine():
            CenterArc((FILLET_8_R, FILLET_8_R), FILLET_8_R, 180, 90)
            Line((-6.4e-16, FILLET_8_R), (-FILLET_8_R * 0.02, FILLET_8_R))
            Line((-FILLET_8_R * 0.02, FILLET_8_R), (-FILLET_8_R * 0.02, -FILLET_8_R * 0.02))
            Line((-FILLET_8_R * 0.02, -FILLET_8_R * 0.02), (FILLET_8_R, -FILLET_8_R * 0.02))
            Line((FILLET_8_R, -FILLET_8_R * 0.02), (FILLET_8_R, 0))
        make_face()
    fillet_8_piece_22b = extrude(amount=35.02441898081173, mode=Mode.PRIVATE)
    fillet_8_piece_22b = split(fillet_8_piece_22b, bisect_by=Plane(origin=(8.432556222299931, 2.18255622229994, 11.031503687899992), z_dir=(-0.7071067811865476, 0.7071067811865476, 0)), keep=Keep.TOP, mode=Mode.PRIVATE)
    fillet_8_piece_22 = fillet_8_piece_22a & fillet_8_piece_22b
    add(fillet_8_piece_22, mode=Mode.SUBTRACT)
    with BuildSketch(Plane(origin=(4.999999999999991, 35.36168625197876, 10.02727001545246), x_dir=(-1, -4.4e-16, 1.3e-16), z_dir=(0, -0.9975640502598243, 0.06975647374412541))) as fillet_8_piece_23a_section:
        with BuildLine():
            CenterArc((FILLET_8_R, FILLET_8_R), FILLET_8_R, 180, 90)
            Line((-1.38e-15, FILLET_8_R), (-FILLET_8_R * 0.02, FILLET_8_R))
            Line((-FILLET_8_R * 0.02, FILLET_8_R), (-FILLET_8_R * 0.02, -FILLET_8_R * 0.02))
            Line((-FILLET_8_R * 0.02, -FILLET_8_R * 0.02), (FILLET_8_R, -FILLET_8_R * 0.02))
            Line((FILLET_8_R, -FILLET_8_R * 0.02), (FILLET_8_R, 0))
        make_face()
    fillet_8_piece_23a = extrude(amount=35.024418980811724, mode=Mode.PRIVATE)
    fillet_8_piece_23a = split(fillet_8_piece_23a, bisect_by=Plane(origin=(1.0921943538327015, 8.984329977563627, 10.871141253313416), z_dir=(0.7071067811865501, -0.707106781186545, 0)), keep=Keep.TOP, mode=Mode.PRIVATE)
    with BuildSketch(Plane(origin=(-3.402831812476554, 4.489303811254339, 12.186077296633133), x_dir=(0.707968543318461, -0.7045235927201029, 0.04926508877790491), z_dir=(0.7062439675293066, 0.7062439675293118, -0.04938538910366094))) as fillet_8_piece_23b_section:
        with BuildLine():
            CenterArc((FILLET_8_R * 0.951833326591, FILLET_8_R), FILLET_8_R, 182.8272773602871, 87.1727226397129)
            Line((-FILLET_8_R * 0.0469494411747, FILLET_8_R * 0.950674724384), (-FILLET_8_R * 0.06692509653, FILLET_8_R * 0.949688218872))
            Line((-FILLET_8_R * 0.06692509653, FILLET_8_R * 0.949688218872), (-FILLET_8_R * 0.0190366665318, -FILLET_8_R * 0.02))
            Line((-FILLET_8_R * 0.0190366665318, -FILLET_8_R * 0.02), (FILLET_8_R * 0.951833326591, -FILLET_8_R * 0.02))
            Line((FILLET_8_R * 0.951833326591, -FILLET_8_R * 0.02), (FILLET_8_R * 0.951833326591, -3e-17))
        make_face()
    fillet_8_piece_23b = extrude(amount=33.808050099667255, mode=Mode.PRIVATE)
    fillet_8_piece_23b = split(fillet_8_piece_23b, bisect_by=Plane(origin=(5.0000000000000036, 7.643322173814852, 10.829851457653136), z_dir=(-1, -4.4e-16, 0)), keep=Keep.TOP, mode=Mode.PRIVATE)
    fillet_8_piece_23 = fillet_8_piece_23a & fillet_8_piece_23b
    add(fillet_8_piece_23, mode=Mode.SUBTRACT)
    with BuildSketch(Plane(origin=(-20.47389962434201, 28.366035248073096, 10.516453587625001), x_dir=(-0.7079685433184622, -0.7045235927201017, 0.04926508877790538), z_dir=(0.7062439675293055, -0.706243967529313, 0.04938538910366102))) as fillet_8_piece_24a_section:
        with BuildLine():
            CenterArc((FILLET_8_R * 0.951833326591, FILLET_8_R), FILLET_8_R, 182.8272773602871, 87.1727226397129)
            Line((-FILLET_8_R * 0.0469494411747, FILLET_8_R * 0.950674724384), (-FILLET_8_R * 0.06692509653, FILLET_8_R * 0.949688218872))
            Line((-FILLET_8_R * 0.06692509653, FILLET_8_R * 0.949688218872), (-FILLET_8_R * 0.0190366665318, -FILLET_8_R * 0.02))
            Line((-FILLET_8_R * 0.0190366665318, -FILLET_8_R * 0.02), (FILLET_8_R * 0.951833326591, -FILLET_8_R * 0.02))
            Line((FILLET_8_R * 0.951833326591, -FILLET_8_R * 0.02), (FILLET_8_R * 0.951833326591, 5e-17))
        make_face()
    fillet_8_piece_24a = extrude(amount=33.808050099667234, mode=Mode.PRIVATE)
    fillet_8_piece_24a = split(fillet_8_piece_24a, bisect_by=Plane(origin=(-5.0000000000000275, 7.643322173814315, 10.829851457653326), z_dir=(1, 9e-17, 0)), keep=Keep.TOP, mode=Mode.PRIVATE)
    with BuildSketch(Plane(origin=(-5.0000000000000275, 0.4225849954831524, 12.4704499784907), x_dir=(1, 9e-17, -3e-17), z_dir=(0, 0.9975640502598243, -0.06975647374412541))) as fillet_8_piece_24b_section:
        with BuildLine():
            CenterArc((FILLET_8_R, FILLET_8_R), FILLET_8_R, 180, 90)
            Line((-7.6e-16, FILLET_8_R), (-FILLET_8_R * 0.02, FILLET_8_R))
            Line((-FILLET_8_R * 0.02, FILLET_8_R), (-FILLET_8_R * 0.02, -FILLET_8_R * 0.02))
            Line((-FILLET_8_R * 0.02, -FILLET_8_R * 0.02), (FILLET_8_R, -FILLET_8_R * 0.02))
            Line((FILLET_8_R, -FILLET_8_R * 0.02), (FILLET_8_R, 0))
        make_face()
    fillet_8_piece_24b = extrude(amount=35.02441898081172, mode=Mode.PRIVATE)
    fillet_8_piece_24b = split(fillet_8_piece_24b, bisect_by=Plane(origin=(-1.0921943538329444, 8.98432997756383, 10.871141253313246), z_dir=(-0.7071067811865512, -0.7071067811865438, 0)), keep=Keep.TOP, mode=Mode.PRIVATE)
    fillet_8_piece_24 = fillet_8_piece_24a & fillet_8_piece_24b
    add(fillet_8_piece_24, mode=Mode.SUBTRACT)


solid = part.part
